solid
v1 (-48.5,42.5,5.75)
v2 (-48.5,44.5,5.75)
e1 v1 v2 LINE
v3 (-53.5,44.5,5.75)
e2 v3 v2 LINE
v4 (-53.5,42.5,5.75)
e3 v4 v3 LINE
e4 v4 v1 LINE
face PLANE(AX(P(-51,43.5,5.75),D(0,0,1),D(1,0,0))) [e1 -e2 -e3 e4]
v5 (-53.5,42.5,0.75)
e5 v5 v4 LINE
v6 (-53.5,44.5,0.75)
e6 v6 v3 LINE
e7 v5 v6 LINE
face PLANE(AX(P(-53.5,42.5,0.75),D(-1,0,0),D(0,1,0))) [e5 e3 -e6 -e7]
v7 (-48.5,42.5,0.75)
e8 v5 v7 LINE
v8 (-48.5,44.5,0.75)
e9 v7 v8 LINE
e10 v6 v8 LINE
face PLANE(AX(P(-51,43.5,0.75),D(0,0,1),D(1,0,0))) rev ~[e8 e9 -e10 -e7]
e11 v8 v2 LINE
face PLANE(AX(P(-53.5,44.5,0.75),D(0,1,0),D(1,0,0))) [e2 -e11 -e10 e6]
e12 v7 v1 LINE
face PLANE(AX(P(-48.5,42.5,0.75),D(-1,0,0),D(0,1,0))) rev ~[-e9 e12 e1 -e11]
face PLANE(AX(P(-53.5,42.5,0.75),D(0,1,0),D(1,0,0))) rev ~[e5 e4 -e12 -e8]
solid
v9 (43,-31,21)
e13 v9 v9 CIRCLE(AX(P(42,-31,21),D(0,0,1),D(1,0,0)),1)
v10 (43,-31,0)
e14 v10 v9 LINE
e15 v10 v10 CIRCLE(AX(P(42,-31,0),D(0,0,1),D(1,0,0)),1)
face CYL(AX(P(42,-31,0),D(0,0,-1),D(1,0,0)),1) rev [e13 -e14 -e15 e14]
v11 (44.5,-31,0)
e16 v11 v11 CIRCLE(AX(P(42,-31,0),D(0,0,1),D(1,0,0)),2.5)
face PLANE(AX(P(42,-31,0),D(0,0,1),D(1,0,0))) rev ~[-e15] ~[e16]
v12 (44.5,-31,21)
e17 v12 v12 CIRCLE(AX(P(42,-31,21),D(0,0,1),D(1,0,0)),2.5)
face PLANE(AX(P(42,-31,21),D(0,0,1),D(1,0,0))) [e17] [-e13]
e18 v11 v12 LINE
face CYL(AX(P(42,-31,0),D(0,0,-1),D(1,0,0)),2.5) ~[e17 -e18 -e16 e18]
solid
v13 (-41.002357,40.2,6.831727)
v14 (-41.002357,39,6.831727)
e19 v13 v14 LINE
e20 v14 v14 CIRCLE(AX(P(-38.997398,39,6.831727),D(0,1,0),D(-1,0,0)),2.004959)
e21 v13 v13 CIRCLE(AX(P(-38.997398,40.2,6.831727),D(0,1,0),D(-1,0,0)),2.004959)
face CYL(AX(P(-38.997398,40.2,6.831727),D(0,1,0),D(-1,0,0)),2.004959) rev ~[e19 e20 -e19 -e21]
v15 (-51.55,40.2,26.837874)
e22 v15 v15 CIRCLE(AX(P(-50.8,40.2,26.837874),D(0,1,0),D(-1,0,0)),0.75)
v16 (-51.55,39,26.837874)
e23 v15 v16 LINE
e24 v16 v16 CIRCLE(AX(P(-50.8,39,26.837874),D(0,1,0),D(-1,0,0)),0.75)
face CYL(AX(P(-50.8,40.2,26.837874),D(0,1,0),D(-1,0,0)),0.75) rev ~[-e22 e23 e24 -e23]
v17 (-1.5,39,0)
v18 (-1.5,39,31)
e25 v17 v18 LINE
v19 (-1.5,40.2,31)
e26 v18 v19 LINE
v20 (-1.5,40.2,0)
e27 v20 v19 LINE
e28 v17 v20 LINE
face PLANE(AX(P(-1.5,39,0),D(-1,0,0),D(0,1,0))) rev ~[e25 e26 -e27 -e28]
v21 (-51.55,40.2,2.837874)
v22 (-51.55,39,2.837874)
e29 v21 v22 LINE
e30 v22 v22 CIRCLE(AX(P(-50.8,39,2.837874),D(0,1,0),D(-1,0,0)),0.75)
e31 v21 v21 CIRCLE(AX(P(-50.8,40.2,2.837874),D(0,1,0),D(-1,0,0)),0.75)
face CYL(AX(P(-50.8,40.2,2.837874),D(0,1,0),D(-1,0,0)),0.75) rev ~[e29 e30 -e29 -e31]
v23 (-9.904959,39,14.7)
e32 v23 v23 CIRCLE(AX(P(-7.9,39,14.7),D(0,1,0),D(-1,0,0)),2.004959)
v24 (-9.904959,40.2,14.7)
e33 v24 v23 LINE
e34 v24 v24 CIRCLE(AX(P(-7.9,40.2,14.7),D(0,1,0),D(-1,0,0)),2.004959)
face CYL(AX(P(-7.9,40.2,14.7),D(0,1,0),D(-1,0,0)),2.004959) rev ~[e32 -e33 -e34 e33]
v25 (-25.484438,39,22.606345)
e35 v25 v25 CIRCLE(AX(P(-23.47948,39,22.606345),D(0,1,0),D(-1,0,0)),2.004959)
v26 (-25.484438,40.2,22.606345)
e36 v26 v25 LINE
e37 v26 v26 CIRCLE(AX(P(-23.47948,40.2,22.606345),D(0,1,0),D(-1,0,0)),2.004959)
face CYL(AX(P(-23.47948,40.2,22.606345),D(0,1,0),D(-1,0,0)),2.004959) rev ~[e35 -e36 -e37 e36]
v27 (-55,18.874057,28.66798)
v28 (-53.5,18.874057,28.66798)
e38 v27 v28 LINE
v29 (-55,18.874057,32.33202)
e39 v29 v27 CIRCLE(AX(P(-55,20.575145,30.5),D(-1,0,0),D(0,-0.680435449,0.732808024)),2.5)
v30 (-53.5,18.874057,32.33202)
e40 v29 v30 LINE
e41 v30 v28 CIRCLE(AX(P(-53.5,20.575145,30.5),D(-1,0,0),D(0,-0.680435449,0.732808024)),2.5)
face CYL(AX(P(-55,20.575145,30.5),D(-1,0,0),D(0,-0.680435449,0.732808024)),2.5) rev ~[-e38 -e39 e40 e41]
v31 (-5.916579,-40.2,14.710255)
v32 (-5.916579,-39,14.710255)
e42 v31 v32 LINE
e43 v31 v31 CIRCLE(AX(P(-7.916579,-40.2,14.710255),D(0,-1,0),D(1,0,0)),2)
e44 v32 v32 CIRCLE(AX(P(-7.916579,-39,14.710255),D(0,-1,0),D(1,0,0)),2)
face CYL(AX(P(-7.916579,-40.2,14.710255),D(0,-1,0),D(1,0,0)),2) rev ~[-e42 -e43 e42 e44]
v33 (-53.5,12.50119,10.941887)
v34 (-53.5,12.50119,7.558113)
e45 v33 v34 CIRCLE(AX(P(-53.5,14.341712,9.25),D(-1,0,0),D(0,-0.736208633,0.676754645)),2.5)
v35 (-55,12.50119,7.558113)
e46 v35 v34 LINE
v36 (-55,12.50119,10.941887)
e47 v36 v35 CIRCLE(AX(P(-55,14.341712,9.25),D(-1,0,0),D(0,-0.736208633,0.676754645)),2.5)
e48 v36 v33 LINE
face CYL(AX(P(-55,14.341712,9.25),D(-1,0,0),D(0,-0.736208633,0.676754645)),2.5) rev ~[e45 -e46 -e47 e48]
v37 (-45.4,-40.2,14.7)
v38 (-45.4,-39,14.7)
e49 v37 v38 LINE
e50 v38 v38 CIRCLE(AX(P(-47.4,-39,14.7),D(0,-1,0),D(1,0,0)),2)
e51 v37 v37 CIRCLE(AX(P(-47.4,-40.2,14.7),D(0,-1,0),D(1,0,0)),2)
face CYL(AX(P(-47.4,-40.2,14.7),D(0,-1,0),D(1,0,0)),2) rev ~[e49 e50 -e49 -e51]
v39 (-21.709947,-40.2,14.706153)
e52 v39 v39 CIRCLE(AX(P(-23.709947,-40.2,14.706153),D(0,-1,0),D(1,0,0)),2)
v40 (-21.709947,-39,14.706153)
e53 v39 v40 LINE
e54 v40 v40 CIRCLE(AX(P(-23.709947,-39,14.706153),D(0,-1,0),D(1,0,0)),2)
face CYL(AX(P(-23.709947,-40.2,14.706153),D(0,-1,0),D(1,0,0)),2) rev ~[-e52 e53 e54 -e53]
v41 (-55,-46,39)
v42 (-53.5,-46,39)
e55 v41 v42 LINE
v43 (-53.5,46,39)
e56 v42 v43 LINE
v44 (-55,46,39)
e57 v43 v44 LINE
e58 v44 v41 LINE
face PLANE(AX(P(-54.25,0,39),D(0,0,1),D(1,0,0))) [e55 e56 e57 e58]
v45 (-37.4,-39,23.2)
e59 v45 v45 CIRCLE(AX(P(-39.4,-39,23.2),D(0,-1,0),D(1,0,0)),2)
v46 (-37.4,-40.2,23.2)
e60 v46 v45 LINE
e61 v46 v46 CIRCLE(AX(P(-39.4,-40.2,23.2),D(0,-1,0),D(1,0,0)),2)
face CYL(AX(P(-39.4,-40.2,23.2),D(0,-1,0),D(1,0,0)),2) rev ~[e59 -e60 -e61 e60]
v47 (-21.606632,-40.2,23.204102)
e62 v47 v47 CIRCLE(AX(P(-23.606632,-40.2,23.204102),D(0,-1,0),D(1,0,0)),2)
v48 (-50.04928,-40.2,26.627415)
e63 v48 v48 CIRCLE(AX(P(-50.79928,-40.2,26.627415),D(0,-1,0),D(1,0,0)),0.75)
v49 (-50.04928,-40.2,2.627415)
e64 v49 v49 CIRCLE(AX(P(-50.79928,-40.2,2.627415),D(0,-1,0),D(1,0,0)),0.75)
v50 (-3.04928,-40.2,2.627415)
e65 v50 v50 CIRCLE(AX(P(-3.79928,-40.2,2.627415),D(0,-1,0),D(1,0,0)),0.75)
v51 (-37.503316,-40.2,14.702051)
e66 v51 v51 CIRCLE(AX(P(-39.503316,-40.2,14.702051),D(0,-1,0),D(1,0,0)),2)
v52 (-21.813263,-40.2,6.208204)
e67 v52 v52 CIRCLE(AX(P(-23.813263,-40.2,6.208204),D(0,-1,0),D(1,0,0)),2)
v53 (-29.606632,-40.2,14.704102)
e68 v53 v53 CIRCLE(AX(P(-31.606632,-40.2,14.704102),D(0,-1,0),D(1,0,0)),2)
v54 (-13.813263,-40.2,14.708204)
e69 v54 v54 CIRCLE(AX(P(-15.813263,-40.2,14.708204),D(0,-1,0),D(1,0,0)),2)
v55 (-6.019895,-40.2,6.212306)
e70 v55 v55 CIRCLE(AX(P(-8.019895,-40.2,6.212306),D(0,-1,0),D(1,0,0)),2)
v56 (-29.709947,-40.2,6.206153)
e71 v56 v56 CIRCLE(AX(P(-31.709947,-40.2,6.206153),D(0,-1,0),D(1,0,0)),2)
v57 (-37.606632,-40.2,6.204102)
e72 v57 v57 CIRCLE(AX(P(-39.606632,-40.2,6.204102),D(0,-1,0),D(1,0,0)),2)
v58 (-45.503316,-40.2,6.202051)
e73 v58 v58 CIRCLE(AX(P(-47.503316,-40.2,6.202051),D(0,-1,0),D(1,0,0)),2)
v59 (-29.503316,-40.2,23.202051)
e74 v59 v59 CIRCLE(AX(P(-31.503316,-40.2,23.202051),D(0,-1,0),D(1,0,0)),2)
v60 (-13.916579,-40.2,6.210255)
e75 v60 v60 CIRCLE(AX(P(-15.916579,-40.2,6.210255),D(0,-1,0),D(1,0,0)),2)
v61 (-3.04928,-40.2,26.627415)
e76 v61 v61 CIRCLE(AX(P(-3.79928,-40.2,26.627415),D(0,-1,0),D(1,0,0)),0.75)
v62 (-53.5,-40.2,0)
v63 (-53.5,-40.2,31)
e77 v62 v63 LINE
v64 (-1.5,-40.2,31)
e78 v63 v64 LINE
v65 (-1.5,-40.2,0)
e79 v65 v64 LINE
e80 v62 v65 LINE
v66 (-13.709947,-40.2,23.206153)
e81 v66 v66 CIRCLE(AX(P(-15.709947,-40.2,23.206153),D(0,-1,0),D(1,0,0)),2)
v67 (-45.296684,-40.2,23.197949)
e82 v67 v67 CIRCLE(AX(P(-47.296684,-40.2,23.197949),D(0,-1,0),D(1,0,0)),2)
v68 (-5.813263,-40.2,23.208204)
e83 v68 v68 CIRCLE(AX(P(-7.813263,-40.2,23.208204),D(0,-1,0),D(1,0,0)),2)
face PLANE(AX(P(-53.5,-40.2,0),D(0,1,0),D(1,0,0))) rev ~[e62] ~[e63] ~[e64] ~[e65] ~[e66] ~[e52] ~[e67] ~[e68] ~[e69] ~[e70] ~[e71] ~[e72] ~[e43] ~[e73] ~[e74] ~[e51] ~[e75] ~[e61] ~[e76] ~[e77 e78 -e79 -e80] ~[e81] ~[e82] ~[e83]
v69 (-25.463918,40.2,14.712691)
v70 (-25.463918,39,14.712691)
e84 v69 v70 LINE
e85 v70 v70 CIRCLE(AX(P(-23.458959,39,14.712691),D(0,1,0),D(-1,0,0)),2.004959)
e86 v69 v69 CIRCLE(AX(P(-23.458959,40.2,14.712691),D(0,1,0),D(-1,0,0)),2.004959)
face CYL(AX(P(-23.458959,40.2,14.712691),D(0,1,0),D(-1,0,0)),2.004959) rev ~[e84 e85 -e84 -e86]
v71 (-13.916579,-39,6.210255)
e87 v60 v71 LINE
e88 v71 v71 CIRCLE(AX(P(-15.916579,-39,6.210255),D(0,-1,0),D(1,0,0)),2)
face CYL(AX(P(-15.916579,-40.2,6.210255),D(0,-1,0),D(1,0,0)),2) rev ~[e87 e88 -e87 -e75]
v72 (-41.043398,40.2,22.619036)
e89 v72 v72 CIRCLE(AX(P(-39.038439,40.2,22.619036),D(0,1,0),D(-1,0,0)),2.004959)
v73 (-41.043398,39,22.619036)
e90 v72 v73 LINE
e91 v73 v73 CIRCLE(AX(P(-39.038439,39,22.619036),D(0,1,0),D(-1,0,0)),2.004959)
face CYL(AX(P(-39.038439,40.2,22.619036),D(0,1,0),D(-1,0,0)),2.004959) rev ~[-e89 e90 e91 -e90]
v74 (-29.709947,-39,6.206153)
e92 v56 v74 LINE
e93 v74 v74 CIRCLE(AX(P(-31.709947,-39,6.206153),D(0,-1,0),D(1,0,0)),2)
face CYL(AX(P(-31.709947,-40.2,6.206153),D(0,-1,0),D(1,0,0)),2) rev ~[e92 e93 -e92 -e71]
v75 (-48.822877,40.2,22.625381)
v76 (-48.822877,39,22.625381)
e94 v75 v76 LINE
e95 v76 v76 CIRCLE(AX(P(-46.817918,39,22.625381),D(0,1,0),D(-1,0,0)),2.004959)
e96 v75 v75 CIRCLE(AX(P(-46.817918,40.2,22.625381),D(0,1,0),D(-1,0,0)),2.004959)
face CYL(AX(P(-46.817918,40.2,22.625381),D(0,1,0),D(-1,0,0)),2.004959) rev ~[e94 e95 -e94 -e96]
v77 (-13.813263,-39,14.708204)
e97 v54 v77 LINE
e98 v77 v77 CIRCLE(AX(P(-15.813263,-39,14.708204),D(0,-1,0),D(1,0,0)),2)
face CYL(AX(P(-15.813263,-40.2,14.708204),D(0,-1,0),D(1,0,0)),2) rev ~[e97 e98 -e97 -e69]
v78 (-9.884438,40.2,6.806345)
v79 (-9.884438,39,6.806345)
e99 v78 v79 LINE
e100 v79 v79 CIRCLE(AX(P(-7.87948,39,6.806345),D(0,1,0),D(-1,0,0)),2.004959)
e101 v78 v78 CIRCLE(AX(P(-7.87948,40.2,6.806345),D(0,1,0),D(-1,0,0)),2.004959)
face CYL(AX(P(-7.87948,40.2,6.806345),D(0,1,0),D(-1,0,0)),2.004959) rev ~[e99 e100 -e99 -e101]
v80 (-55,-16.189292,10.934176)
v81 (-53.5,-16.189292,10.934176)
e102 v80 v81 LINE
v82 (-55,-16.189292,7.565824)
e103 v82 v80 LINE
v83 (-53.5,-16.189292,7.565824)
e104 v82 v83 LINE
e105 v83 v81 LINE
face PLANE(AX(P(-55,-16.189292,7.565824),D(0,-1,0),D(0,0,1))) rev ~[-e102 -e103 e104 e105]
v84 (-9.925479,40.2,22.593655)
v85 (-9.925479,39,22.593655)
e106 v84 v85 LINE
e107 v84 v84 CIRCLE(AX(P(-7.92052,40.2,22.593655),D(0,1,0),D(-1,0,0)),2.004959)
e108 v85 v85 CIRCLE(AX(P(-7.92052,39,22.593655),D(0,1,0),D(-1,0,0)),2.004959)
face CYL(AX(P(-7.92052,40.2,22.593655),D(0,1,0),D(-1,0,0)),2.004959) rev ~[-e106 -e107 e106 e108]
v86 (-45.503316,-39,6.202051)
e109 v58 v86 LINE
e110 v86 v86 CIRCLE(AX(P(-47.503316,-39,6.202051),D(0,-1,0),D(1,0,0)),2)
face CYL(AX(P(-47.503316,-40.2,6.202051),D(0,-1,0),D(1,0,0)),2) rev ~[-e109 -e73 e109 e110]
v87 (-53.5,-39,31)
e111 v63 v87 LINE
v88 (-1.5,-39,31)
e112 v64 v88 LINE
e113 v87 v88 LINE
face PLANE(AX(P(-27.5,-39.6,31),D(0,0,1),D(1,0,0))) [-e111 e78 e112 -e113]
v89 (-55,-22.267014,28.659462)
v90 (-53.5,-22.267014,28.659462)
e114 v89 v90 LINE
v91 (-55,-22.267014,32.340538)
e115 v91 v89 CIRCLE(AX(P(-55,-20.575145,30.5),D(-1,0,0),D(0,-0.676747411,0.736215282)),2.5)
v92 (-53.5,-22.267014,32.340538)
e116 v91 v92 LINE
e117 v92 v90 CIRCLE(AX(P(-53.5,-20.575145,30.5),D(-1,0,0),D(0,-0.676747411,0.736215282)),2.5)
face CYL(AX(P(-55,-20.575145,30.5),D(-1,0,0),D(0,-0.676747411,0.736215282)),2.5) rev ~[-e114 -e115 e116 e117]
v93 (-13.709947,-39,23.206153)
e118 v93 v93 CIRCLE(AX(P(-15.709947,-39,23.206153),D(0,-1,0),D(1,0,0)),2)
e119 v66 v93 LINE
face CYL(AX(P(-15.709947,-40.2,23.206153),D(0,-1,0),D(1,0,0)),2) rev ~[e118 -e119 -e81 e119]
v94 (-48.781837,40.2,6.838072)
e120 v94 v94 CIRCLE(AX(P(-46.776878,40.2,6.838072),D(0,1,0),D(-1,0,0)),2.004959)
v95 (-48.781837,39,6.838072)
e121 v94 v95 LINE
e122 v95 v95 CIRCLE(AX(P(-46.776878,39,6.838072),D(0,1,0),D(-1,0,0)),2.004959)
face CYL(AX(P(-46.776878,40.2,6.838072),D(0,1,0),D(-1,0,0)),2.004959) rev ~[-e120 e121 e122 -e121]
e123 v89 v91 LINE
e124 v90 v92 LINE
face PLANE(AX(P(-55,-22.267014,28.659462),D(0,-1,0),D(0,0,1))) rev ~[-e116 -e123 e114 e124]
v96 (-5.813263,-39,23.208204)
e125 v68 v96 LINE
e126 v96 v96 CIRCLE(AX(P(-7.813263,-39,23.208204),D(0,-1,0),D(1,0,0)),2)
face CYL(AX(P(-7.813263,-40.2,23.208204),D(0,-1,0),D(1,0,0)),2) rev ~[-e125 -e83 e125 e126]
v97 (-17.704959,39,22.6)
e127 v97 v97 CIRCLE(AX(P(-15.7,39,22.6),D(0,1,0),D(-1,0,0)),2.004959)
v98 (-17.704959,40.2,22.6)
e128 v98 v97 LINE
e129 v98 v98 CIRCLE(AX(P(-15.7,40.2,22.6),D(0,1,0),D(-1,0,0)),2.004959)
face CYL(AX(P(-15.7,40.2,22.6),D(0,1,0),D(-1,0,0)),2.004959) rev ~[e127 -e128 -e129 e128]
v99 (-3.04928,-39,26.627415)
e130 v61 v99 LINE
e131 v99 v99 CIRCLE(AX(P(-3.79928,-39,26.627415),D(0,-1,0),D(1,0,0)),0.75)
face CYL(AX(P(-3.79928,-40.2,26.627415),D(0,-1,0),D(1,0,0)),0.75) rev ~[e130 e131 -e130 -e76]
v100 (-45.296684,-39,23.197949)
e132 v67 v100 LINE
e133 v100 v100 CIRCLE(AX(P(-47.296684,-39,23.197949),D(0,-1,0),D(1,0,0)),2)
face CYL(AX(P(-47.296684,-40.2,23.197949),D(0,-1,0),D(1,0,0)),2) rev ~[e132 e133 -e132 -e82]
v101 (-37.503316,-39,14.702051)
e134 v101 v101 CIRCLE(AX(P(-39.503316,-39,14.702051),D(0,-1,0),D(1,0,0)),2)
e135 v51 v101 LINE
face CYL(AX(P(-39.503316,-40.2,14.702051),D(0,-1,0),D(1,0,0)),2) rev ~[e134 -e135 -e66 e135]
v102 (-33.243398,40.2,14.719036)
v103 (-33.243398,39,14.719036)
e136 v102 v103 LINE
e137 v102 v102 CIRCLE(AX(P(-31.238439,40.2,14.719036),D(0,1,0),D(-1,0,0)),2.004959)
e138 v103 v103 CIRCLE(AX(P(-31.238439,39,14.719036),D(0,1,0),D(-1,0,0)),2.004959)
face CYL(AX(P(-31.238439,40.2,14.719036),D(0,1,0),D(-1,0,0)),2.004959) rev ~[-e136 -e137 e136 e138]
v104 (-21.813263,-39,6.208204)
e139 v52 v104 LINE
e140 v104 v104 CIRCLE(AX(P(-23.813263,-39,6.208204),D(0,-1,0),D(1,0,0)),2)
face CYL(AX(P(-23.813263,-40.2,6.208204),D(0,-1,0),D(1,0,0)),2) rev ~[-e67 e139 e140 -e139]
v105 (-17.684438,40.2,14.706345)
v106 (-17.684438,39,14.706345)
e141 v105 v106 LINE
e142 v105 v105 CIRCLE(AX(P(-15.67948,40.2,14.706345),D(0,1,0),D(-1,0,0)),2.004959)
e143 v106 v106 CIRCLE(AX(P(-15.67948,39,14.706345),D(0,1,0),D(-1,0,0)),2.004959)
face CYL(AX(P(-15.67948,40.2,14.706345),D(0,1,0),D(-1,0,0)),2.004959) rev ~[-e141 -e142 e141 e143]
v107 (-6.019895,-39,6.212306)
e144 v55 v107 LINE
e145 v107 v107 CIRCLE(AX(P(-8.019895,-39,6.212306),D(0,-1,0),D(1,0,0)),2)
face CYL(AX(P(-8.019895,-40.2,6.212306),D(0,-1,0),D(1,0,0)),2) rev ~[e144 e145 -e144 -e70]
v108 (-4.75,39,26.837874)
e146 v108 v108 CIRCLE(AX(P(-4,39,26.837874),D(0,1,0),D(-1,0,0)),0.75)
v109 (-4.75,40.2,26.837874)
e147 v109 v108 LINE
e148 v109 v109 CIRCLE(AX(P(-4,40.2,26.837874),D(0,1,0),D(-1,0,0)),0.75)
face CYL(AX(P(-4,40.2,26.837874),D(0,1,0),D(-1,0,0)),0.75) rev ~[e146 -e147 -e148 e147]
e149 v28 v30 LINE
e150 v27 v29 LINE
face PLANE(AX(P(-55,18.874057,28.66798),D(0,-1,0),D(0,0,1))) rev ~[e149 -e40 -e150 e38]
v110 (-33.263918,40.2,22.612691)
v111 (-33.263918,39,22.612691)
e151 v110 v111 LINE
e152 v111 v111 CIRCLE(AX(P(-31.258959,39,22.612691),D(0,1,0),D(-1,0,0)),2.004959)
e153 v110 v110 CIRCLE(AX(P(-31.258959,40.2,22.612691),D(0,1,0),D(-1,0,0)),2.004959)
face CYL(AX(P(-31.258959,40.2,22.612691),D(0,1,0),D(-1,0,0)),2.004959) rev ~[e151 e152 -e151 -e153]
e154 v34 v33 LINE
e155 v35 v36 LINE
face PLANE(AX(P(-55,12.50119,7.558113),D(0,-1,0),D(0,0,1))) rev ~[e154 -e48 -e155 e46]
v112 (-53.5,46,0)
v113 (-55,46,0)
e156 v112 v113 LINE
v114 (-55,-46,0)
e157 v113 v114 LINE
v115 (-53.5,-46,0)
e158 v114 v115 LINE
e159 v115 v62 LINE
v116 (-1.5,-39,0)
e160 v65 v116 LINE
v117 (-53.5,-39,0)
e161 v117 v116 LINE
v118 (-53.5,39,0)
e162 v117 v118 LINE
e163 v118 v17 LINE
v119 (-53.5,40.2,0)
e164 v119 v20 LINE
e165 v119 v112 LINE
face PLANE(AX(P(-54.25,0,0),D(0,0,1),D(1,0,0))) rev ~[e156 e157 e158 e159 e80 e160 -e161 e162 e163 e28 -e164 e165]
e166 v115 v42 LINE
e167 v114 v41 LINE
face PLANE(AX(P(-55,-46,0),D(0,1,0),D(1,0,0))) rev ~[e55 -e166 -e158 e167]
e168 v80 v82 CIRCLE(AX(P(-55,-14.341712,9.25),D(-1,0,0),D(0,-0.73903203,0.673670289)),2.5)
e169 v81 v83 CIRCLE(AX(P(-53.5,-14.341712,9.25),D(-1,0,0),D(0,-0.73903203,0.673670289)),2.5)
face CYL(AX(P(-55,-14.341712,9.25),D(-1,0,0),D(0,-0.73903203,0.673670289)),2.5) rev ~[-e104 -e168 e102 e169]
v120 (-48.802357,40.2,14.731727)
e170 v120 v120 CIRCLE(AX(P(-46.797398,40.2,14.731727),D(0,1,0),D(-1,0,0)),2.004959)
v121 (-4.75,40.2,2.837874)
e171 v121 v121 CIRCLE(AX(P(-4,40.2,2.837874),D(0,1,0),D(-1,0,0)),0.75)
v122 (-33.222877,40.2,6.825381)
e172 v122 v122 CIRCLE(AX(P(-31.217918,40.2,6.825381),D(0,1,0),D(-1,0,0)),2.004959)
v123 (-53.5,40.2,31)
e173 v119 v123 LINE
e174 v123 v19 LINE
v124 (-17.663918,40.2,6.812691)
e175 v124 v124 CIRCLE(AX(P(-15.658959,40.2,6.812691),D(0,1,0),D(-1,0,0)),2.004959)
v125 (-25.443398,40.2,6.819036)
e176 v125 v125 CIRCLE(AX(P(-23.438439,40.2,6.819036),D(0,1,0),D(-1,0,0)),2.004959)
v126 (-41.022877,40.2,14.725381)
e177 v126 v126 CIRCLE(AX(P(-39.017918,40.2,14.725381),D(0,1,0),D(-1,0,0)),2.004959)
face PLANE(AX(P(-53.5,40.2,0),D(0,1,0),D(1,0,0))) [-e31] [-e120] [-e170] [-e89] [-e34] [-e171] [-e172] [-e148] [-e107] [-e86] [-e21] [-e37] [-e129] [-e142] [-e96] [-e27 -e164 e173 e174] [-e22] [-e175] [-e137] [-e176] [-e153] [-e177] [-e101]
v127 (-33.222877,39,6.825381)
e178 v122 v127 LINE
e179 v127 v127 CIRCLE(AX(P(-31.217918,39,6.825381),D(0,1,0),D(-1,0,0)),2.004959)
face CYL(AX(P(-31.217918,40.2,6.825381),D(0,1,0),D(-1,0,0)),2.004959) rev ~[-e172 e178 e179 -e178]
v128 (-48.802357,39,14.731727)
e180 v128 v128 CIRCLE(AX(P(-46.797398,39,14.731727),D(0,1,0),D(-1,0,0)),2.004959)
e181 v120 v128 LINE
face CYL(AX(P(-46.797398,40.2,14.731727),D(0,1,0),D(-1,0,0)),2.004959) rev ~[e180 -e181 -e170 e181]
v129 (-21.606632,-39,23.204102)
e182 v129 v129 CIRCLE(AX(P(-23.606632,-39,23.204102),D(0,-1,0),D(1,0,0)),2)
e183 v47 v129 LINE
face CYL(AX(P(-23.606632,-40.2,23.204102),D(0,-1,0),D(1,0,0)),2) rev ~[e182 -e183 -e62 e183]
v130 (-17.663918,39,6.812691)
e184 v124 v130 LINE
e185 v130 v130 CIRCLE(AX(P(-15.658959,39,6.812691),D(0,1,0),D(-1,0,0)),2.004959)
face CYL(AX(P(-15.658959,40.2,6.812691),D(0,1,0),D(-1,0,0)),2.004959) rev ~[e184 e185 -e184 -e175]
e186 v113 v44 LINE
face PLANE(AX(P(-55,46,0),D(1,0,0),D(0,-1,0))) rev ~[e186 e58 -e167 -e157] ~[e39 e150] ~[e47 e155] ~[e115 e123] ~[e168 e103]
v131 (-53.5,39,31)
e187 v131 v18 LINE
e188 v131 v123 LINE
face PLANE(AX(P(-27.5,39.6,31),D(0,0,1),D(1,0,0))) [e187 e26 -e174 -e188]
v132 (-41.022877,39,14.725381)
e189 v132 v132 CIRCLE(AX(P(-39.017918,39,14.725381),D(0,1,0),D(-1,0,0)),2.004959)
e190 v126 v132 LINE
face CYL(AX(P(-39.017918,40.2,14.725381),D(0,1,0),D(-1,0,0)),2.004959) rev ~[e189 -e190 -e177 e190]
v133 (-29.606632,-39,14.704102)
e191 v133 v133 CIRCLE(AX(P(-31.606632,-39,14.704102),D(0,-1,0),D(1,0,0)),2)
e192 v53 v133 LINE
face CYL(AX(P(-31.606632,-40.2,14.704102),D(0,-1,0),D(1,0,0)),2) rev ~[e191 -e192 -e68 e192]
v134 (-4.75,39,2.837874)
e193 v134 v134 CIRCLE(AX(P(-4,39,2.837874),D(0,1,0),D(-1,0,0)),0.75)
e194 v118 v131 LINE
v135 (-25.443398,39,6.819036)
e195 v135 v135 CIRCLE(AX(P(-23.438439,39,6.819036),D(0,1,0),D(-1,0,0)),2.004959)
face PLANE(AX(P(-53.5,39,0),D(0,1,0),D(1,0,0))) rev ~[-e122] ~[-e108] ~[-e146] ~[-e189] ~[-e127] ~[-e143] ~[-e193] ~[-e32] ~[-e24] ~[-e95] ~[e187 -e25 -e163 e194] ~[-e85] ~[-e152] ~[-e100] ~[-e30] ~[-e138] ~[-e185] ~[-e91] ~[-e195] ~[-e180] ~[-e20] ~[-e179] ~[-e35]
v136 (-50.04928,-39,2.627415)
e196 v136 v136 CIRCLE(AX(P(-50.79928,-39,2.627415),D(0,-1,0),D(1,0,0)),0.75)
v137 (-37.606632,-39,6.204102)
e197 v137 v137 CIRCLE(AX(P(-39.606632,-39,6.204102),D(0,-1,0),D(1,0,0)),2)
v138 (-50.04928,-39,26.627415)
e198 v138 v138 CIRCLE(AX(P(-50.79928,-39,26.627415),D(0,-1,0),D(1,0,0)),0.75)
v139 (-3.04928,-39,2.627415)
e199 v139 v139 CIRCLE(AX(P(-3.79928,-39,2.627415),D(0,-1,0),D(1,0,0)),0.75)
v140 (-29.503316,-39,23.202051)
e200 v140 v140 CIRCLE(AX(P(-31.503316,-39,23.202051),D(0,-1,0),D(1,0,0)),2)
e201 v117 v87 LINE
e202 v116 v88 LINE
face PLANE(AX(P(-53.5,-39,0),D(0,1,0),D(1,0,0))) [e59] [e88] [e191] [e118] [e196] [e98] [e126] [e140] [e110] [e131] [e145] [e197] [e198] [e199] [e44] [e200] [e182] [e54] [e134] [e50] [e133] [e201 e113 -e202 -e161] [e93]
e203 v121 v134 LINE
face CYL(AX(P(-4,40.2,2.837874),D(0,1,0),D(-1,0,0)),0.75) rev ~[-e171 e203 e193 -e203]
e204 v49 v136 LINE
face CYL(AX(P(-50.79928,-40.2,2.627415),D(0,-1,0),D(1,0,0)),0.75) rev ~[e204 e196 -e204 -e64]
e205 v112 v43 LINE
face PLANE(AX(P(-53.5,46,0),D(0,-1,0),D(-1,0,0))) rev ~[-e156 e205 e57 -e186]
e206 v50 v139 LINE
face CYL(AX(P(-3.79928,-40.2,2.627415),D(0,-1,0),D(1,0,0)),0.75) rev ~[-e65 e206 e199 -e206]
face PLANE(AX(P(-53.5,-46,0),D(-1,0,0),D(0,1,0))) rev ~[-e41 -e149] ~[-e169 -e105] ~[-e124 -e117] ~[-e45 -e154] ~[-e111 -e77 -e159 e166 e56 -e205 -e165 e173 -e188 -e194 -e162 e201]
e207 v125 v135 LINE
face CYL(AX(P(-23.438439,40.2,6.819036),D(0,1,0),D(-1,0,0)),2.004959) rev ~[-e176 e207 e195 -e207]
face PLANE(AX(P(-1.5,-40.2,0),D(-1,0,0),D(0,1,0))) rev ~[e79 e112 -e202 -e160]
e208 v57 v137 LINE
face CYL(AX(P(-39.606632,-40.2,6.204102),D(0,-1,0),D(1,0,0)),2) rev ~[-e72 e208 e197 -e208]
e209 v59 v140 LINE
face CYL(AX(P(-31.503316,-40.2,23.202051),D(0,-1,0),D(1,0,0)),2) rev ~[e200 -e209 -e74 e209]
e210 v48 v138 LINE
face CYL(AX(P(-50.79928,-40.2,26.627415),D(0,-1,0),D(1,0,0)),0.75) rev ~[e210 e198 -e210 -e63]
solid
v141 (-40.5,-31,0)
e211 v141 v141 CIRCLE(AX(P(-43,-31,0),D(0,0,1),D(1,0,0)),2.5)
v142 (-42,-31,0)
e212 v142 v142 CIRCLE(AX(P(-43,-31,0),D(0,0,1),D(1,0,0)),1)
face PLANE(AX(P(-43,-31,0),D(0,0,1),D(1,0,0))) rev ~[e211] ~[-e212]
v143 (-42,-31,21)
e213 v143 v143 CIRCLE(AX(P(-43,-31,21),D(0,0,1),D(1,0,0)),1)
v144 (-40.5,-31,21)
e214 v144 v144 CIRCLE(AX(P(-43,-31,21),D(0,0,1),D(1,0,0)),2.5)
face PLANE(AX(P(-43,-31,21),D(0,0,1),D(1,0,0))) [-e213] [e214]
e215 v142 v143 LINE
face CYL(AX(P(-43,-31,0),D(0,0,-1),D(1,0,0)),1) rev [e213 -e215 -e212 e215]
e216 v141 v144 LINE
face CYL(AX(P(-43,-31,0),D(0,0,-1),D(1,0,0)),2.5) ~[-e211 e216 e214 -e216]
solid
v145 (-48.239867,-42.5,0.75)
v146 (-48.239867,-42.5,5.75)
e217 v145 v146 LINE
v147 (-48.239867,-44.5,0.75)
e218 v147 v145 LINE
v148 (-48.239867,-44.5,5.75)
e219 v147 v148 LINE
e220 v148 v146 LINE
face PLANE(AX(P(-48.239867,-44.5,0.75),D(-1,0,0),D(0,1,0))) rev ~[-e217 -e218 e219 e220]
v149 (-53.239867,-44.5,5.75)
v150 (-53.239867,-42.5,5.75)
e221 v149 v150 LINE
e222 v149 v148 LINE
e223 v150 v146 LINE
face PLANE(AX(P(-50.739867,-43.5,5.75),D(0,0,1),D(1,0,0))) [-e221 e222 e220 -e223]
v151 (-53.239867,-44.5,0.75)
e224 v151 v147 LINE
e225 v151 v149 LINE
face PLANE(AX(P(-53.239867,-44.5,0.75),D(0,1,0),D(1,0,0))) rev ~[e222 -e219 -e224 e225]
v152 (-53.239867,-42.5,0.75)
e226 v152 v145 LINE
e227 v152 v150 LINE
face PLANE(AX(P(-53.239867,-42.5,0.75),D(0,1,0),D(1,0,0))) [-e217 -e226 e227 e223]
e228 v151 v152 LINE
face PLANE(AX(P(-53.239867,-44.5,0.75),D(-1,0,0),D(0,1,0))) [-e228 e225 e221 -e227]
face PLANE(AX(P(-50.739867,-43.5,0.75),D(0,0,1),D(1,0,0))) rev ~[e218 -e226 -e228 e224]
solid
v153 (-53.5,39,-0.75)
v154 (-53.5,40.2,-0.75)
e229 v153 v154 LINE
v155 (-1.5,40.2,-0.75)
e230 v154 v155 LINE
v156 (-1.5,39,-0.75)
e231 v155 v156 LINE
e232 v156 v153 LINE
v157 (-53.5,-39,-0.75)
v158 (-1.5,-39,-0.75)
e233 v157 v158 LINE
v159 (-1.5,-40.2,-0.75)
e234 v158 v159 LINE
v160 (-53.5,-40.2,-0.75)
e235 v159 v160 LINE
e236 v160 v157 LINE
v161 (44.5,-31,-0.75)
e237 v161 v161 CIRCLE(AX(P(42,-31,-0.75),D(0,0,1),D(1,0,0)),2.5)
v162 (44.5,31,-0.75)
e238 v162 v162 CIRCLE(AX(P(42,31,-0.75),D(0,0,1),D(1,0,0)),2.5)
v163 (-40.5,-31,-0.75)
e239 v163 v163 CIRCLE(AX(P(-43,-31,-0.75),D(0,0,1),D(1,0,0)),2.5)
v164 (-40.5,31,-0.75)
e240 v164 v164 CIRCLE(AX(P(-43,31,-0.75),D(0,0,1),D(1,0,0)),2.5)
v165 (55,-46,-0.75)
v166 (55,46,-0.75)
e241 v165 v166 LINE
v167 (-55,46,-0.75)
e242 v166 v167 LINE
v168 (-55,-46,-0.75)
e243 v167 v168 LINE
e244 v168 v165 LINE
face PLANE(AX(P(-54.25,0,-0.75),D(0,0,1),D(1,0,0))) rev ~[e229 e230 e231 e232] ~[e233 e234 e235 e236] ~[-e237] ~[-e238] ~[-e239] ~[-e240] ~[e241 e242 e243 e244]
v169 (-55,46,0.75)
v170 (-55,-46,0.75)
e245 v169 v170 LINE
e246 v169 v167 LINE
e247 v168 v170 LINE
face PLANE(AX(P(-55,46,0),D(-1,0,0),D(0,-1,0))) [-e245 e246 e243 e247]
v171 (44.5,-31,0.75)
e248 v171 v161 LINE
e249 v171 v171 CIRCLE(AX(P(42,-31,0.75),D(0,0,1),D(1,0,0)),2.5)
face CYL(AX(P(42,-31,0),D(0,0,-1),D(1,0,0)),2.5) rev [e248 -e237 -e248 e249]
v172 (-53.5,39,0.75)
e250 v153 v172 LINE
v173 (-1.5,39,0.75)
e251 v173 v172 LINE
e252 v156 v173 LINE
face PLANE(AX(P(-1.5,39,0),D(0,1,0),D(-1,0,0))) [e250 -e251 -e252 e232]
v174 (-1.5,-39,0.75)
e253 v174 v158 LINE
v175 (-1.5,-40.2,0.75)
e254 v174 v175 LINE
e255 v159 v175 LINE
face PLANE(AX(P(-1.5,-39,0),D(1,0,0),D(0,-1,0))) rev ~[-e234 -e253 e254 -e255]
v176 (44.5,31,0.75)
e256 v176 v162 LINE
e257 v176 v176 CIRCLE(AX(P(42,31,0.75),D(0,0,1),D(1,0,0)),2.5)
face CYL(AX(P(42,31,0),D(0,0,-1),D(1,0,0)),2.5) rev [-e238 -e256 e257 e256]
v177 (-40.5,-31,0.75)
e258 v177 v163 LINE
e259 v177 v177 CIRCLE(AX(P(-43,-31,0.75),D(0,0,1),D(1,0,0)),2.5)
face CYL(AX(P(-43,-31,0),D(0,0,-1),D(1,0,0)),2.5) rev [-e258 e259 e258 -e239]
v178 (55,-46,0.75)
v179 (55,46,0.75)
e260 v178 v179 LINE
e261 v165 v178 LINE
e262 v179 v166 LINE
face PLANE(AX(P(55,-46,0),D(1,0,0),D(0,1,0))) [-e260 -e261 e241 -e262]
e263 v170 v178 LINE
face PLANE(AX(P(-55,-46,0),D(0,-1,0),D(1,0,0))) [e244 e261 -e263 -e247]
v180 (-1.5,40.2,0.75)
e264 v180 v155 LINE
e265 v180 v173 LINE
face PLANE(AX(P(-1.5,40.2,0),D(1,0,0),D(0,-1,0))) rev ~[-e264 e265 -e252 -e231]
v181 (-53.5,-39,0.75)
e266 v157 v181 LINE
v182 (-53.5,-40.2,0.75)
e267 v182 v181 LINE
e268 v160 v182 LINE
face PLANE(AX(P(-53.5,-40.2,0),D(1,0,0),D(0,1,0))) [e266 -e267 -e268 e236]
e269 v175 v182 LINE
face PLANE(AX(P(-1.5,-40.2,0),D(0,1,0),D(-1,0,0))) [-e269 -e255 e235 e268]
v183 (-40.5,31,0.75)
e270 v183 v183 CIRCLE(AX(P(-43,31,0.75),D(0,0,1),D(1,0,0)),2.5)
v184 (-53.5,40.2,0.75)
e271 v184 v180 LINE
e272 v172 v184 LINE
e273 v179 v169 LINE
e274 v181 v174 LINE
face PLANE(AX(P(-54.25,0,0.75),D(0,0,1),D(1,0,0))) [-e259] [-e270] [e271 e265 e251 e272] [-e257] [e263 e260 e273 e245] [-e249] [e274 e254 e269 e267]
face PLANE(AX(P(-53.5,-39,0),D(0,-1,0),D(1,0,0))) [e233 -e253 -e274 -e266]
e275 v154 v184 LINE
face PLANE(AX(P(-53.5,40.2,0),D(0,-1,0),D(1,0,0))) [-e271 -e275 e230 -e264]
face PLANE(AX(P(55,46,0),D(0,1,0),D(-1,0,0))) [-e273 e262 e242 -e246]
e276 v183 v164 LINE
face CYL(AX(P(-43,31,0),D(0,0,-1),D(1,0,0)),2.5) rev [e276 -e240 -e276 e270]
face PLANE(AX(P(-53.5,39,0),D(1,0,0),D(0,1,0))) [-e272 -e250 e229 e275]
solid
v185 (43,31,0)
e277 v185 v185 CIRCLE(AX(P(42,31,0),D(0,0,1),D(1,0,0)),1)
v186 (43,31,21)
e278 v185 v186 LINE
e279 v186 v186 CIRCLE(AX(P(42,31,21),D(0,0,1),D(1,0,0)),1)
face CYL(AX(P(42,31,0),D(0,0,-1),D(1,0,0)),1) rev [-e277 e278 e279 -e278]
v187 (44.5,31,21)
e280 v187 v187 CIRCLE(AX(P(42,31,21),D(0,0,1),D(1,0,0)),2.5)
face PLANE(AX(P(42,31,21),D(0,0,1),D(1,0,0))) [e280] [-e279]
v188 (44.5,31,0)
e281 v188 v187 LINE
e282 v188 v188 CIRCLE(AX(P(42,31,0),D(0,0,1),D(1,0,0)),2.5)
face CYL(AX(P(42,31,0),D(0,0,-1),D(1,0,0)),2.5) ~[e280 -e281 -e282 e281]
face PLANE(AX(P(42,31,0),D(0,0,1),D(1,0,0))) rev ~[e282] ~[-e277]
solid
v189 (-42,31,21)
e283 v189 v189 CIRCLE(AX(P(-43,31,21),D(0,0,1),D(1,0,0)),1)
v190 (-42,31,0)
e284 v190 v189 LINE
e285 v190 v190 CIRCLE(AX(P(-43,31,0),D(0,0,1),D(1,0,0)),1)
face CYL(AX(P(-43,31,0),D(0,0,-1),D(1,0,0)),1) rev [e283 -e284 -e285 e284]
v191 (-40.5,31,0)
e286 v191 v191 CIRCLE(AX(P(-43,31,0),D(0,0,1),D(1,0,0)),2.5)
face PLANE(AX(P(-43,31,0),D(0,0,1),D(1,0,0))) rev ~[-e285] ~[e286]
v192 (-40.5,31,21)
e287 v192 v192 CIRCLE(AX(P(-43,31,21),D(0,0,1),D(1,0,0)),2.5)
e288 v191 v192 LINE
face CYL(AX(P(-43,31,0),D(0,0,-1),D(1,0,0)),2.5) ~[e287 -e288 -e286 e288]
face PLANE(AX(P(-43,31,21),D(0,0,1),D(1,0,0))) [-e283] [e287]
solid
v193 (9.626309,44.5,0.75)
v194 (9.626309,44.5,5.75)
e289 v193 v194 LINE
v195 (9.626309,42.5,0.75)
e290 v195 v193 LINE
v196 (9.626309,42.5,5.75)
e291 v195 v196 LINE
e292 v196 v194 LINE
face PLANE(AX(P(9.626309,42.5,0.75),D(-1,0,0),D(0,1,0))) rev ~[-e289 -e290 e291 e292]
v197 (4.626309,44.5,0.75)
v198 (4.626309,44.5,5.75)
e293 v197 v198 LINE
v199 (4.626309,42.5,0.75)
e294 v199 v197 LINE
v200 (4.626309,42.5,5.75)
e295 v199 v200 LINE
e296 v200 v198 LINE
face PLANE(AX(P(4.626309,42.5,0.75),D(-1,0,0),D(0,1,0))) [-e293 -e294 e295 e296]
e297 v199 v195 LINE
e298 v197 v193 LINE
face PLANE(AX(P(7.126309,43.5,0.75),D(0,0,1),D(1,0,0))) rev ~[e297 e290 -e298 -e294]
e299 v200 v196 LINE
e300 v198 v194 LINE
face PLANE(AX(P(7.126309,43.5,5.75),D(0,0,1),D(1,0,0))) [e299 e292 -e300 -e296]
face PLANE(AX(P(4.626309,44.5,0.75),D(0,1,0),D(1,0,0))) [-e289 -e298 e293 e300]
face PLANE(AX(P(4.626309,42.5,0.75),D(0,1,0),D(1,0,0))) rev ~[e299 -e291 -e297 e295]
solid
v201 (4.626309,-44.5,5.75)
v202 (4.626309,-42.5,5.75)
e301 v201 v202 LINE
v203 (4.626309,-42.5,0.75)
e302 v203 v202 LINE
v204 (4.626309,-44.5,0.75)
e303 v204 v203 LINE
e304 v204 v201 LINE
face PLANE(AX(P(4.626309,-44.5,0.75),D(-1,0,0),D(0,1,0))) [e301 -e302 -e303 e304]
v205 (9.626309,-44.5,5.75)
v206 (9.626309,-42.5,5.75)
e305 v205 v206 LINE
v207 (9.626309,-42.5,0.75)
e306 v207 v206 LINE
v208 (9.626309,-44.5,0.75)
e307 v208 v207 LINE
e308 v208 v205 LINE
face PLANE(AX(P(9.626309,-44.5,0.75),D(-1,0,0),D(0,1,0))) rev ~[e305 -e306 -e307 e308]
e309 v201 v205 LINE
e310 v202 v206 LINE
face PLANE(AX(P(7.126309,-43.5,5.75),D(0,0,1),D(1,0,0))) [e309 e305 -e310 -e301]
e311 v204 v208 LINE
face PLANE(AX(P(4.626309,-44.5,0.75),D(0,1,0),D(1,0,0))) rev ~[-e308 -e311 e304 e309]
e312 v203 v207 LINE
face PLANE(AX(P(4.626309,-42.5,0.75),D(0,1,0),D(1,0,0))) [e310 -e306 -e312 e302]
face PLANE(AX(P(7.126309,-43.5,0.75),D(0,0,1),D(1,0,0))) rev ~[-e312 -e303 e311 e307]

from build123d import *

# Parameters (mm, degrees)
F0_R      = 2.5
F0_R_2    = 1
F1_DEPTH  = 21
F2_DEPTH  = 39
F0_W      = 52
F0_H      = 1.2
F3_DEPTH  = 31
F4_R      = 0.75
F4_R_2    = 2.0049588284
F5_DEPTH  = 25
F6_R      = 0.75
F6_R_2    = 2
F7_DEPTH  = 25
F8_DEPTH  = 0.75
F10_DEPTH = 25
F11_W     = 5
F11_H     = 2
F12_DEPTH = 5


# Not quite as in the source:
# - a feature names something its author has since deleted; it is built from what else it names


with BuildPart() as f1:
    # F0 (on Top) → F1 (new body)
    with BuildSketch(Plane.XY):
        with Locations((-43, 31)):
            Circle(F0_R)
        with Locations((-43, 31)):
            Circle(F0_R_2, mode=Mode.SUBTRACT)
    extrude(amount=F1_DEPTH)


with BuildPart() as f1b:
    # F0 (on Top) → F1, piece 2 (new body)
    with BuildSketch(Plane.XY):
        with Locations((-43, -31)):
            Circle(F0_R)
        with Locations((-43, -31)):
            Circle(F0_R_2, mode=Mode.SUBTRACT)
    extrude(amount=F1_DEPTH)


with BuildPart() as f1c:
    # F0 (on Top) → F1, piece 3 (new body)
    with BuildSketch(Plane.XY):
        with Locations((42, -31)):
            Circle(F0_R)
        with Locations((42, -31)):
            Circle(F0_R_2, mode=Mode.SUBTRACT)
    extrude(amount=F1_DEPTH)


with BuildPart() as f1d:
    # F0 (on Top) → F1, piece 4 (new body)
    with BuildSketch(Plane.XY):
        with Locations((42, 31)):
            Circle(F0_R)
        with Locations((42, 31)):
            Circle(F0_R_2, mode=Mode.SUBTRACT)
    extrude(amount=F1_DEPTH)


with BuildPart() as f2:
    # F0 (on Top) → F2 (new body)
    with BuildSketch(Plane.XY):
        Polygon((-53.5, 46), (-55, 46), (-55, -46), (-53.5, -46), (-53.5, -40.2), (-53.5, -39), (-53.5, 39), (-53.5, 40.2), align=None)
    extrude(amount=F2_DEPTH)

    # F0 (on Top) → F3 (join)
    with BuildSketch(Plane.XY):
        with Locations((-27.5, 39.6)):
            Rectangle(F0_W, F0_H)
        with Locations((-27.5, -39.6)):
            Rectangle(F0_W, F0_H)
    extrude(amount=F3_DEPTH)

    # F4 (on face) → F5 (cut)
    with BuildSketch(Plane(origin=(0, 40.2, 0), x_dir=(-1, 0, 0), z_dir=(0, 1, 0))):
        with Locations((4, 26.8378742281)):
            Circle(F4_R)
        with Locations((50.8, 26.8378742281)):
            Circle(F4_R)
        with Locations((50.8, 2.8378742281)):
            Circle(F4_R)
        with Locations((4, 2.8378742281)):
            Circle(F4_R)
        with Locations((7.9205203801, 22.5936546922)):
            Circle(F4_R_2)
        with Locations((7.9, 14.7)):
            Circle(F4_R_2)
        with Locations((7.8794796199, 6.8063453078)):
            Circle(F4_R_2)
        with Locations((15.7, 22.6)):
            Circle(F4_R_2)
        with Locations((15.6794796199, 14.7063453078)):
            Circle(F4_R_2)
        with Locations((15.6589592397, 6.8126906157)):
            Circle(F4_R_2)
        with Locations((23.4794796199, 22.6063453078)):
            Circle(F4_R_2)
        with Locations((23.4589592397, 14.7126906157)):
            Circle(F4_R_2)
        with Locations((23.4384388596, 6.8190359235)):
            Circle(F4_R_2)
        with Locations((31.2589592397, 22.6126906157)):
            Circle(F4_R_2)
        with Locations((31.2384388596, 14.7190359235)):
            Circle(F4_R_2)
        with Locations((31.2179184794, 6.8253812313)):
            Circle(F4_R_2)
        with Locations((39.0384388596, 22.6190359235)):
            Circle(F4_R_2)
        with Locations((39.0179184794, 14.7253812313)):
            Circle(F4_R_2)
        with Locations((38.9973980993, 6.8317265391)):
            Circle(F4_R_2)
        with Locations((46.8179184794, 22.6253812313)):
            Circle(F4_R_2)
        with Locations((46.7973980993, 14.7317265391)):
            Circle(F4_R_2)
        with Locations((46.7768777192, 6.838071847)):
            Circle(F4_R_2)
    extrude(amount=-F5_DEPTH, mode=Mode.SUBTRACT)

    # F6 (on face) → F7 (cut)
    with BuildSketch(Plane.XZ.offset(40.2)):
        with Locations((-50.799280405, 26.6274153497)):
            Circle(F6_R)
        with Locations((-3.799280405, 26.6274153497)):
            Circle(F6_R)
        with Locations((-3.799280405, 2.6274153497)):
            Circle(F6_R)
        with Locations((-50.799280405, 2.6274153497)):
            Circle(F6_R)
        with Locations((-47.2966842353, 23.1979489326)):
            Circle(F6_R_2)
        with Locations((-47.4, 14.7)):
            Circle(F6_R_2)
        with Locations((-47.5033157647, 6.2020510674)):
            Circle(F6_R_2)
        with Locations((-39.4, 23.2)):
            Circle(F6_R_2)
        with Locations((-39.5033157647, 14.7020510674)):
            Circle(F6_R_2)
        with Locations((-39.6066315293, 6.2041021347)):
            Circle(F6_R_2)
        with Locations((-31.5033157647, 23.2020510674)):
            Circle(F6_R_2)
        with Locations((-31.6066315293, 14.7041021347)):
            Circle(F6_R_2)
        with Locations((-31.709947294, 6.2061532021)):
            Circle(F6_R_2)
        with Locations((-23.6066315293, 23.2041021347)):
            Circle(F6_R_2)
        with Locations((-23.709947294, 14.7061532021)):
            Circle(F6_R_2)
        with Locations((-23.8132630587, 6.2082042694)):
            Circle(F6_R_2)
        with Locations((-15.709947294, 23.2061532021)):
            Circle(F6_R_2)
        with Locations((-15.8132630587, 14.7082042694)):
            Circle(F6_R_2)
        with Locations((-15.9165788233, 6.2102553368)):
            Circle(F6_R_2)
        with Locations((-7.8132630587, 23.2082042694)):
            Circle(F6_R_2)
        with Locations((-7.9165788233, 14.7102553368)):
            Circle(F6_R_2)
        with Locations((-8.019894588, 6.2123064041)):
            Circle(F6_R_2)
    extrude(amount=-F7_DEPTH, mode=Mode.SUBTRACT)

    # F9 (on face) → F10 (cut)
    with BuildSketch(Plane(origin=(-55, 0, 0), x_dir=(0, -1, 0), z_dir=(-1, 0, 0))):
        with BuildLine():
            Line((-18.8740566373, 28.6679799402), (-18.8740566373, 32.3320200598))
            ThreePointArc((-18.8740566373, 32.3320200598), (-23.0751452595, 30.5), (-18.8740566373, 28.6679799402))
        make_face()
        with BuildLine():
            Line((22.2670137882, 28.6594617957), (22.2670137882, 32.3405382043))
            ThreePointArc((22.2670137882, 32.3405382043), (18.0751452595, 30.5), (22.2670137882, 28.6594617957))
        make_face()
        with BuildLine():
            Line((-12.5011904165, 7.5581133879), (-12.5011904165, 10.9418866121))
            ThreePointArc((-12.5011904165, 10.9418866121), (-16.841711998, 9.25), (-12.5011904165, 7.5581133879))
        make_face()
        with BuildLine():
            Line((16.1892920732, 7.5658242771), (16.1892920732, 10.9341757229))
            ThreePointArc((16.1892920732, 10.9341757229), (11.841711998, 9.25), (16.1892920732, 7.5658242771))
        make_face()
    extrude(amount=-F10_DEPTH, mode=Mode.SUBTRACT)


with BuildPart() as f8:
    # F0 (on Top) → F8 (new body, symmetric)
    with BuildSketch(Plane.XY):
        Polygon((-53.5, 46), (-55, 46), (-55, -46), (-53.5, -46), (-53.5, -40.2), (-53.5, -39), (-53.5, 39), (-53.5, 40.2), align=None)
        Polygon((55, 46), (-53.5, 46), (-53.5, 40.2), (-1.5, 40.2), (-1.5, 39), (-53.5, 39), (-53.5, -39), (-1.5, -39), (-1.5, -40.2), (-53.5, -40.2), (-53.5, -46), (55, -46), align=None)
        with Locations((-43, -31)):
            Circle(F0_R, mode=Mode.SUBTRACT)
        with Locations((42, -31)):
            Circle(F0_R, mode=Mode.SUBTRACT)
        with Locations((-43, 31)):
            Circle(F0_R, mode=Mode.SUBTRACT)
        with Locations((42, 31)):
            Circle(F0_R, mode=Mode.SUBTRACT)
    extrude(amount=F8_DEPTH, both=True)


with BuildPart() as f12:
    # F11 (on face) → F12 (new body)
    with BuildSketch(Plane.XY.offset(0.75)):
        with Locations((7.1263094991, -43.5)):
            Rectangle(F11_W, F11_H)
    extrude(amount=F12_DEPTH)


with BuildPart() as f12b:
    # F11 (on face) → F12, piece 2 (new body)
    with BuildSketch(Plane.XY.offset(0.75)):
        with Locations((7.1263094991, 43.5)):
            Rectangle(F11_W, F11_H)
    extrude(amount=F12_DEPTH)


with BuildPart() as f12c:
    # F11 (on face) → F12, piece 3 (new body)
    with BuildSketch(Plane.XY.offset(0.75)):
        with Locations((-51, 43.5)):
            Rectangle(F11_W, F11_H)
    extrude(amount=F12_DEPTH)


with BuildPart() as f12d:
    # F11 (on face) → F12, piece 4 (new body)
    with BuildSketch(Plane.XY.offset(0.75)):
        with Locations((-50.7398670912, -43.5)):
            Rectangle(F11_W, F11_H)
    extrude(amount=F12_DEPTH)


solid = Compound([f1.part, f1b.part, f1c.part, f1d.part, f2.part, f8.part, f12.part, f12b.part, f12c.part, f12d.part])
